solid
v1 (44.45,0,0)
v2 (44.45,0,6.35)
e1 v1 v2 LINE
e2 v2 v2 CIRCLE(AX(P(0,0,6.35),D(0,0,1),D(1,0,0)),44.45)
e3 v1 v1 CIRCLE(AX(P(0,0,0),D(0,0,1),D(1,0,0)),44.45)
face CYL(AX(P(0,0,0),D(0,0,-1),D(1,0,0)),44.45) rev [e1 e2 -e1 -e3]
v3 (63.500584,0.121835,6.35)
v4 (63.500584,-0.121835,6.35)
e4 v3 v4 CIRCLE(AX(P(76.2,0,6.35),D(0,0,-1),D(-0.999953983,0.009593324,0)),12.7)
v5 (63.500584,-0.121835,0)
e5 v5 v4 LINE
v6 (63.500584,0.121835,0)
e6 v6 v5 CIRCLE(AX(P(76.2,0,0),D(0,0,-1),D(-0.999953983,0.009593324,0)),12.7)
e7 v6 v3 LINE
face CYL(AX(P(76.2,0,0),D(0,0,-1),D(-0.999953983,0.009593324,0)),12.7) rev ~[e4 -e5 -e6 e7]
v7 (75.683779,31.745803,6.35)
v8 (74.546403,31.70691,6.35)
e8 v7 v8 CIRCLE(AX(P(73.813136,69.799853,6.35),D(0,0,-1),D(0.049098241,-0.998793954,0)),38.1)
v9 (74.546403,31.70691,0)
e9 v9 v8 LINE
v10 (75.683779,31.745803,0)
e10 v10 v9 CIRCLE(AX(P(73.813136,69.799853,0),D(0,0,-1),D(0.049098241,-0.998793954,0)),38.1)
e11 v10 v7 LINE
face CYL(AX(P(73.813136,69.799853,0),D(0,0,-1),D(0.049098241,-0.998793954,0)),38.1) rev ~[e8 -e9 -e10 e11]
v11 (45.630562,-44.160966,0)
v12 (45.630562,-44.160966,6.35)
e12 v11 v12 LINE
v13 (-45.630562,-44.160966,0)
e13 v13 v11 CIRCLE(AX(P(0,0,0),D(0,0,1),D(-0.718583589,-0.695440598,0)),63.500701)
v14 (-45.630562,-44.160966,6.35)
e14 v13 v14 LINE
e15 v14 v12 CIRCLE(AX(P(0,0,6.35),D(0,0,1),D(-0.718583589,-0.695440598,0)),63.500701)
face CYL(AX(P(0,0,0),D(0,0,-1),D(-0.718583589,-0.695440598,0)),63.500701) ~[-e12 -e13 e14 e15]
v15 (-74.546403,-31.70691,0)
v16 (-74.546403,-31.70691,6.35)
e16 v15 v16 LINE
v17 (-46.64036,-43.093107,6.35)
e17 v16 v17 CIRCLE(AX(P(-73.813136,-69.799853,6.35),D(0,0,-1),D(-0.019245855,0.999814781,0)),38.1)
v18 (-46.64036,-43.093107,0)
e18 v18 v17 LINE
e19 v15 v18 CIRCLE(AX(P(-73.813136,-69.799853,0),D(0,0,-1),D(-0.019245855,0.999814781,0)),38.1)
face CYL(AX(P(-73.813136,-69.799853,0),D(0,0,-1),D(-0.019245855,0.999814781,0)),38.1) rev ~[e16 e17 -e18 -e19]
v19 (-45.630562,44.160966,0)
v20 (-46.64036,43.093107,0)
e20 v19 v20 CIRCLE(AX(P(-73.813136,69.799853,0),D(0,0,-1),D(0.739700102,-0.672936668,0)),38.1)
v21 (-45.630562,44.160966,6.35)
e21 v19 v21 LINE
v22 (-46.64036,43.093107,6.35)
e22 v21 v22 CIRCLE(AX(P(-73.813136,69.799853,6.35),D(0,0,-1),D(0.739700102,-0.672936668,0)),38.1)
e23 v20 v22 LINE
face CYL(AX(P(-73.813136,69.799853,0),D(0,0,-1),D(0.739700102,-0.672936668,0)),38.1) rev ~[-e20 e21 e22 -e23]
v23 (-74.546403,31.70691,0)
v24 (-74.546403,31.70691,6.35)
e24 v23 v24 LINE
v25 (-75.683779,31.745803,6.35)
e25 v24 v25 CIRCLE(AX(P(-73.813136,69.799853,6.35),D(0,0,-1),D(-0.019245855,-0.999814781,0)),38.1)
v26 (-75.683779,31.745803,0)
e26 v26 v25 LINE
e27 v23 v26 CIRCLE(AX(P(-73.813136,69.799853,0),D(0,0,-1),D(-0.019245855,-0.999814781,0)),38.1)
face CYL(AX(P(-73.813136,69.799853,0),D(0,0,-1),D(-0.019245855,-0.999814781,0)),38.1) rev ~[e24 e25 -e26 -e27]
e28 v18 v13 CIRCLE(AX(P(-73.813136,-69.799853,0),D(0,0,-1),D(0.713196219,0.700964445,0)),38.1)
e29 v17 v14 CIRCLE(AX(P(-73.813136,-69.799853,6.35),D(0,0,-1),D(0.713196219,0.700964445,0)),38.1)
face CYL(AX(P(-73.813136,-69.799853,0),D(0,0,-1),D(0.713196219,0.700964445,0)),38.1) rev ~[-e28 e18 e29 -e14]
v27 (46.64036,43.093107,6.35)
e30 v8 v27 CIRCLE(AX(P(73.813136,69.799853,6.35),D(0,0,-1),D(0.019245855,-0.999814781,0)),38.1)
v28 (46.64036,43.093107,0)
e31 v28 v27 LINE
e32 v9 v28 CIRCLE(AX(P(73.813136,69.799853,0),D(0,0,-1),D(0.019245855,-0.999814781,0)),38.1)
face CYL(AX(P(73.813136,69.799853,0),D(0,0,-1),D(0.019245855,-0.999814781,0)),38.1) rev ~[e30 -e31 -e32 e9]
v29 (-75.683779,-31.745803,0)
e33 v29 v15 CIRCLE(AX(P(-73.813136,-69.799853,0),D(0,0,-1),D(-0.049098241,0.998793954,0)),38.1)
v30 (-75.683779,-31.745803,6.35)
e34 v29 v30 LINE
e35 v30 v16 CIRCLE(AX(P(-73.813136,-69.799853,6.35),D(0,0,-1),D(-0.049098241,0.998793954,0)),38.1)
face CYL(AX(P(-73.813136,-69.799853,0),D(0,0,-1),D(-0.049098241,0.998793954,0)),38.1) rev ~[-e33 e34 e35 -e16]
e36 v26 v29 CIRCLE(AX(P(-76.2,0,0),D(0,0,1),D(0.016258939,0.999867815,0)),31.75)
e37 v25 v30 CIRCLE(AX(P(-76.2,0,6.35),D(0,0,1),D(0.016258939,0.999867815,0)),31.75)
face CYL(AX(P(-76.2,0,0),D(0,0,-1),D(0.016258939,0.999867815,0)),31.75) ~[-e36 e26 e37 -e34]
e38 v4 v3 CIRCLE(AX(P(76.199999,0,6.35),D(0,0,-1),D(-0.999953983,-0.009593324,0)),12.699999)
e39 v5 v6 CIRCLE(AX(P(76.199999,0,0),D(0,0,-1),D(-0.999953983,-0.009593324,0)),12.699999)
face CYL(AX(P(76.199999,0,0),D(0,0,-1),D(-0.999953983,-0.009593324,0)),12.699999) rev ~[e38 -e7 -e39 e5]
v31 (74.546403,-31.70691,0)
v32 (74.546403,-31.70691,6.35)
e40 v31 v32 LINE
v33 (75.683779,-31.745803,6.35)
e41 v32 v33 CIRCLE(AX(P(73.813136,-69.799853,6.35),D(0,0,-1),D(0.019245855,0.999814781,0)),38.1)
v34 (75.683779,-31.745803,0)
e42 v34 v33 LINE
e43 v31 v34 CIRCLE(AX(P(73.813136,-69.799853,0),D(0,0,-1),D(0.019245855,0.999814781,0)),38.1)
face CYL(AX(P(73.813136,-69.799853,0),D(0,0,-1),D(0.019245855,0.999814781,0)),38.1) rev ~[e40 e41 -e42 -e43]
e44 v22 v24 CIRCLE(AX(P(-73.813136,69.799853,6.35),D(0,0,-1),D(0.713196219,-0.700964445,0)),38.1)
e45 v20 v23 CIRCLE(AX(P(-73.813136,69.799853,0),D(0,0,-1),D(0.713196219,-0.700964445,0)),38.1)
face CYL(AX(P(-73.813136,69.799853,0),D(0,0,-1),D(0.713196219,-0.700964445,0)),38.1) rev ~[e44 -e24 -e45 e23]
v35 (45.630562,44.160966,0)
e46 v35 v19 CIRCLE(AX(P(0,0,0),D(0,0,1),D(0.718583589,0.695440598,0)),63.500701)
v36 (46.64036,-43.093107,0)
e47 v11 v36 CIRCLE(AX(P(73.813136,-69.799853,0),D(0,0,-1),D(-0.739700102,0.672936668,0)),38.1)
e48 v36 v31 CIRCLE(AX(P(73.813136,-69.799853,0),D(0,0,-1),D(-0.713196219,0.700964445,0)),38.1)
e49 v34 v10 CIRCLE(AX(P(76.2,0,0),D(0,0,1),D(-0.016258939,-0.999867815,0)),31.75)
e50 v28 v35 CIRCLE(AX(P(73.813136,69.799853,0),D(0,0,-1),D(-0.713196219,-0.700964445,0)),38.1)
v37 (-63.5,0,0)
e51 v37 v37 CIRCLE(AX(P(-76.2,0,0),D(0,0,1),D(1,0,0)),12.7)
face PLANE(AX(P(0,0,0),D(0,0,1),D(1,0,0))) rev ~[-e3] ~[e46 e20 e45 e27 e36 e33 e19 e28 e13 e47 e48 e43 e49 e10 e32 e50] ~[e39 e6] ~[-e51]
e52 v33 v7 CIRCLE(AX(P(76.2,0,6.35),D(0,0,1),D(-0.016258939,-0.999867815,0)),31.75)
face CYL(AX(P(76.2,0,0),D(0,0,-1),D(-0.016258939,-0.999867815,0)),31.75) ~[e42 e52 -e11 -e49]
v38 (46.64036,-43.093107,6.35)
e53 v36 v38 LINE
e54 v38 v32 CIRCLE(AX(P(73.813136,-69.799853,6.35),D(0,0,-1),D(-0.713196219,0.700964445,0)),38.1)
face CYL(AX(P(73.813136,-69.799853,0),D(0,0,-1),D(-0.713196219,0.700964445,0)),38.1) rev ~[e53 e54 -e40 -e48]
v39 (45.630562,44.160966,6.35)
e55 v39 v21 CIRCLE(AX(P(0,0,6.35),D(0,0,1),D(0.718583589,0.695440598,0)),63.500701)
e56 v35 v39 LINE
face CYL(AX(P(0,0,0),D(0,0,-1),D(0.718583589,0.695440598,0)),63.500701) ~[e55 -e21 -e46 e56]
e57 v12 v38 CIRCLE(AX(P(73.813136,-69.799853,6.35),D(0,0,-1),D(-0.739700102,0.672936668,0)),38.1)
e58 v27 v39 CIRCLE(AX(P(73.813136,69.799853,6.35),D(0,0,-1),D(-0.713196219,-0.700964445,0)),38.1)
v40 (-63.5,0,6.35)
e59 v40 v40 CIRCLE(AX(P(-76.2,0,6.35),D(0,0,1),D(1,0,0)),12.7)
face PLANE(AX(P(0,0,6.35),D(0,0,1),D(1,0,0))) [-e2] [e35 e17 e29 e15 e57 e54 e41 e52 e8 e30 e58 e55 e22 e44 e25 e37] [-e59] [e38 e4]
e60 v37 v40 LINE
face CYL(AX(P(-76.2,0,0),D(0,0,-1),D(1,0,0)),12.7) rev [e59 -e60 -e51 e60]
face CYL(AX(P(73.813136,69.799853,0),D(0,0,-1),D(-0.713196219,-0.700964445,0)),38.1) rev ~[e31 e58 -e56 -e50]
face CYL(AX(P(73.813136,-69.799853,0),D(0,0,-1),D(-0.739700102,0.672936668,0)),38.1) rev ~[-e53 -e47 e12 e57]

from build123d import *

# Parameters (mm, degrees)
F0_R     = 12.7
F0_R_2   = 44.45
F1_DEPTH = 6.35


# Not quite as in the source:
# - a length typed as a fraction of an inch, garbled in the dataset ("3 / 203.2 mm" for 3/8 in), is restored


with BuildPart() as f1:
    # F0 (on Top) → F1 (new body)
    with BuildSketch(Plane.XY):
        with BuildLine():
            ThreePointArc((-74.5464027897, -31.7069095982), (-59.4196204119, -34.5232781397), (-46.6403597532, -43.0931074194))
            ThreePointArc((-46.6403597532, -43.0931074194), (-46.1303112619, -43.6221670242), (-45.6305618227, -44.160965713))
            ThreePointArc((-45.6305618227, -44.160965713), (0, -63.500701295), (45.6305618227, -44.160965713))
            ThreePointArc((45.6305618227, -44.160965713), (46.1303112619, -43.6221670242), (46.6403597532, -43.0931074194))
            ThreePointArc((46.6403597532, -43.0931074194), (59.4196204119, -34.5232781397), (74.5464027897, -31.7069095982))
            ThreePointArc((74.5464027897, -31.7069095982), (75.115235957, -31.7221094671), (75.6837786723, -31.745803117))
            ThreePointArc((75.6837786723, -31.745803117), (107.95, 0), (75.6837786723, 31.745803117))
            ThreePointArc((75.6837786723, 31.745803117), (75.115235957, 31.7221094671), (74.5464027897, 31.7069095982))
            ThreePointArc((74.5464027897, 31.7069095982), (59.4196204119, 34.5232781397), (46.6403597532, 43.0931074194))
            ThreePointArc((46.6403597532, 43.0931074194), (46.1303112619, 43.6221670242), (45.6305618227, 44.160965713))
            ThreePointArc((45.6305618227, 44.160965713), (0, 63.500701295), (-45.6305618227, 44.160965713))
            ThreePointArc((-45.6305618227, 44.160965713), (-46.1303112619, 43.6221670242), (-46.6403597532, 43.0931074194))
            ThreePointArc((-46.6403597532, 43.0931074194), (-59.4196204119, 34.5232781397), (-74.5464027897, 31.7069095982))
            ThreePointArc((-74.5464027897, 31.7069095982), (-75.115235957, 31.7221094671), (-75.6837786723, 31.745803117))
            ThreePointArc((-75.6837786723, 31.745803117), (-107.95, 0), (-75.6837786723, -31.745803117))
            ThreePointArc((-75.6837786723, -31.745803117), (-75.115235957, -31.7221094671), (-74.5464027897, -31.7069095982))
        make_face()
        with Locations((-76.2, 0)):
            Circle(F0_R, mode=Mode.SUBTRACT)
        Circle(F0_R_2, mode=Mode.SUBTRACT)
        with BuildLine():
            ThreePointArc((63.5005844158, 0.1218352114), (76.2609183065, 12.6998538952), (88.9, 0))
            ThreePointArc((88.9, 0), (76.2609183065, -12.6998538952), (63.5005844158, -0.1218352114))
            ThreePointArc((63.5005844158, -0.1218352114), (63.5, 0), (63.5005844158, 0.1218352114))
        make_face(mode=Mode.SUBTRACT)
    extrude(amount=F1_DEPTH)


solid = f1.part
